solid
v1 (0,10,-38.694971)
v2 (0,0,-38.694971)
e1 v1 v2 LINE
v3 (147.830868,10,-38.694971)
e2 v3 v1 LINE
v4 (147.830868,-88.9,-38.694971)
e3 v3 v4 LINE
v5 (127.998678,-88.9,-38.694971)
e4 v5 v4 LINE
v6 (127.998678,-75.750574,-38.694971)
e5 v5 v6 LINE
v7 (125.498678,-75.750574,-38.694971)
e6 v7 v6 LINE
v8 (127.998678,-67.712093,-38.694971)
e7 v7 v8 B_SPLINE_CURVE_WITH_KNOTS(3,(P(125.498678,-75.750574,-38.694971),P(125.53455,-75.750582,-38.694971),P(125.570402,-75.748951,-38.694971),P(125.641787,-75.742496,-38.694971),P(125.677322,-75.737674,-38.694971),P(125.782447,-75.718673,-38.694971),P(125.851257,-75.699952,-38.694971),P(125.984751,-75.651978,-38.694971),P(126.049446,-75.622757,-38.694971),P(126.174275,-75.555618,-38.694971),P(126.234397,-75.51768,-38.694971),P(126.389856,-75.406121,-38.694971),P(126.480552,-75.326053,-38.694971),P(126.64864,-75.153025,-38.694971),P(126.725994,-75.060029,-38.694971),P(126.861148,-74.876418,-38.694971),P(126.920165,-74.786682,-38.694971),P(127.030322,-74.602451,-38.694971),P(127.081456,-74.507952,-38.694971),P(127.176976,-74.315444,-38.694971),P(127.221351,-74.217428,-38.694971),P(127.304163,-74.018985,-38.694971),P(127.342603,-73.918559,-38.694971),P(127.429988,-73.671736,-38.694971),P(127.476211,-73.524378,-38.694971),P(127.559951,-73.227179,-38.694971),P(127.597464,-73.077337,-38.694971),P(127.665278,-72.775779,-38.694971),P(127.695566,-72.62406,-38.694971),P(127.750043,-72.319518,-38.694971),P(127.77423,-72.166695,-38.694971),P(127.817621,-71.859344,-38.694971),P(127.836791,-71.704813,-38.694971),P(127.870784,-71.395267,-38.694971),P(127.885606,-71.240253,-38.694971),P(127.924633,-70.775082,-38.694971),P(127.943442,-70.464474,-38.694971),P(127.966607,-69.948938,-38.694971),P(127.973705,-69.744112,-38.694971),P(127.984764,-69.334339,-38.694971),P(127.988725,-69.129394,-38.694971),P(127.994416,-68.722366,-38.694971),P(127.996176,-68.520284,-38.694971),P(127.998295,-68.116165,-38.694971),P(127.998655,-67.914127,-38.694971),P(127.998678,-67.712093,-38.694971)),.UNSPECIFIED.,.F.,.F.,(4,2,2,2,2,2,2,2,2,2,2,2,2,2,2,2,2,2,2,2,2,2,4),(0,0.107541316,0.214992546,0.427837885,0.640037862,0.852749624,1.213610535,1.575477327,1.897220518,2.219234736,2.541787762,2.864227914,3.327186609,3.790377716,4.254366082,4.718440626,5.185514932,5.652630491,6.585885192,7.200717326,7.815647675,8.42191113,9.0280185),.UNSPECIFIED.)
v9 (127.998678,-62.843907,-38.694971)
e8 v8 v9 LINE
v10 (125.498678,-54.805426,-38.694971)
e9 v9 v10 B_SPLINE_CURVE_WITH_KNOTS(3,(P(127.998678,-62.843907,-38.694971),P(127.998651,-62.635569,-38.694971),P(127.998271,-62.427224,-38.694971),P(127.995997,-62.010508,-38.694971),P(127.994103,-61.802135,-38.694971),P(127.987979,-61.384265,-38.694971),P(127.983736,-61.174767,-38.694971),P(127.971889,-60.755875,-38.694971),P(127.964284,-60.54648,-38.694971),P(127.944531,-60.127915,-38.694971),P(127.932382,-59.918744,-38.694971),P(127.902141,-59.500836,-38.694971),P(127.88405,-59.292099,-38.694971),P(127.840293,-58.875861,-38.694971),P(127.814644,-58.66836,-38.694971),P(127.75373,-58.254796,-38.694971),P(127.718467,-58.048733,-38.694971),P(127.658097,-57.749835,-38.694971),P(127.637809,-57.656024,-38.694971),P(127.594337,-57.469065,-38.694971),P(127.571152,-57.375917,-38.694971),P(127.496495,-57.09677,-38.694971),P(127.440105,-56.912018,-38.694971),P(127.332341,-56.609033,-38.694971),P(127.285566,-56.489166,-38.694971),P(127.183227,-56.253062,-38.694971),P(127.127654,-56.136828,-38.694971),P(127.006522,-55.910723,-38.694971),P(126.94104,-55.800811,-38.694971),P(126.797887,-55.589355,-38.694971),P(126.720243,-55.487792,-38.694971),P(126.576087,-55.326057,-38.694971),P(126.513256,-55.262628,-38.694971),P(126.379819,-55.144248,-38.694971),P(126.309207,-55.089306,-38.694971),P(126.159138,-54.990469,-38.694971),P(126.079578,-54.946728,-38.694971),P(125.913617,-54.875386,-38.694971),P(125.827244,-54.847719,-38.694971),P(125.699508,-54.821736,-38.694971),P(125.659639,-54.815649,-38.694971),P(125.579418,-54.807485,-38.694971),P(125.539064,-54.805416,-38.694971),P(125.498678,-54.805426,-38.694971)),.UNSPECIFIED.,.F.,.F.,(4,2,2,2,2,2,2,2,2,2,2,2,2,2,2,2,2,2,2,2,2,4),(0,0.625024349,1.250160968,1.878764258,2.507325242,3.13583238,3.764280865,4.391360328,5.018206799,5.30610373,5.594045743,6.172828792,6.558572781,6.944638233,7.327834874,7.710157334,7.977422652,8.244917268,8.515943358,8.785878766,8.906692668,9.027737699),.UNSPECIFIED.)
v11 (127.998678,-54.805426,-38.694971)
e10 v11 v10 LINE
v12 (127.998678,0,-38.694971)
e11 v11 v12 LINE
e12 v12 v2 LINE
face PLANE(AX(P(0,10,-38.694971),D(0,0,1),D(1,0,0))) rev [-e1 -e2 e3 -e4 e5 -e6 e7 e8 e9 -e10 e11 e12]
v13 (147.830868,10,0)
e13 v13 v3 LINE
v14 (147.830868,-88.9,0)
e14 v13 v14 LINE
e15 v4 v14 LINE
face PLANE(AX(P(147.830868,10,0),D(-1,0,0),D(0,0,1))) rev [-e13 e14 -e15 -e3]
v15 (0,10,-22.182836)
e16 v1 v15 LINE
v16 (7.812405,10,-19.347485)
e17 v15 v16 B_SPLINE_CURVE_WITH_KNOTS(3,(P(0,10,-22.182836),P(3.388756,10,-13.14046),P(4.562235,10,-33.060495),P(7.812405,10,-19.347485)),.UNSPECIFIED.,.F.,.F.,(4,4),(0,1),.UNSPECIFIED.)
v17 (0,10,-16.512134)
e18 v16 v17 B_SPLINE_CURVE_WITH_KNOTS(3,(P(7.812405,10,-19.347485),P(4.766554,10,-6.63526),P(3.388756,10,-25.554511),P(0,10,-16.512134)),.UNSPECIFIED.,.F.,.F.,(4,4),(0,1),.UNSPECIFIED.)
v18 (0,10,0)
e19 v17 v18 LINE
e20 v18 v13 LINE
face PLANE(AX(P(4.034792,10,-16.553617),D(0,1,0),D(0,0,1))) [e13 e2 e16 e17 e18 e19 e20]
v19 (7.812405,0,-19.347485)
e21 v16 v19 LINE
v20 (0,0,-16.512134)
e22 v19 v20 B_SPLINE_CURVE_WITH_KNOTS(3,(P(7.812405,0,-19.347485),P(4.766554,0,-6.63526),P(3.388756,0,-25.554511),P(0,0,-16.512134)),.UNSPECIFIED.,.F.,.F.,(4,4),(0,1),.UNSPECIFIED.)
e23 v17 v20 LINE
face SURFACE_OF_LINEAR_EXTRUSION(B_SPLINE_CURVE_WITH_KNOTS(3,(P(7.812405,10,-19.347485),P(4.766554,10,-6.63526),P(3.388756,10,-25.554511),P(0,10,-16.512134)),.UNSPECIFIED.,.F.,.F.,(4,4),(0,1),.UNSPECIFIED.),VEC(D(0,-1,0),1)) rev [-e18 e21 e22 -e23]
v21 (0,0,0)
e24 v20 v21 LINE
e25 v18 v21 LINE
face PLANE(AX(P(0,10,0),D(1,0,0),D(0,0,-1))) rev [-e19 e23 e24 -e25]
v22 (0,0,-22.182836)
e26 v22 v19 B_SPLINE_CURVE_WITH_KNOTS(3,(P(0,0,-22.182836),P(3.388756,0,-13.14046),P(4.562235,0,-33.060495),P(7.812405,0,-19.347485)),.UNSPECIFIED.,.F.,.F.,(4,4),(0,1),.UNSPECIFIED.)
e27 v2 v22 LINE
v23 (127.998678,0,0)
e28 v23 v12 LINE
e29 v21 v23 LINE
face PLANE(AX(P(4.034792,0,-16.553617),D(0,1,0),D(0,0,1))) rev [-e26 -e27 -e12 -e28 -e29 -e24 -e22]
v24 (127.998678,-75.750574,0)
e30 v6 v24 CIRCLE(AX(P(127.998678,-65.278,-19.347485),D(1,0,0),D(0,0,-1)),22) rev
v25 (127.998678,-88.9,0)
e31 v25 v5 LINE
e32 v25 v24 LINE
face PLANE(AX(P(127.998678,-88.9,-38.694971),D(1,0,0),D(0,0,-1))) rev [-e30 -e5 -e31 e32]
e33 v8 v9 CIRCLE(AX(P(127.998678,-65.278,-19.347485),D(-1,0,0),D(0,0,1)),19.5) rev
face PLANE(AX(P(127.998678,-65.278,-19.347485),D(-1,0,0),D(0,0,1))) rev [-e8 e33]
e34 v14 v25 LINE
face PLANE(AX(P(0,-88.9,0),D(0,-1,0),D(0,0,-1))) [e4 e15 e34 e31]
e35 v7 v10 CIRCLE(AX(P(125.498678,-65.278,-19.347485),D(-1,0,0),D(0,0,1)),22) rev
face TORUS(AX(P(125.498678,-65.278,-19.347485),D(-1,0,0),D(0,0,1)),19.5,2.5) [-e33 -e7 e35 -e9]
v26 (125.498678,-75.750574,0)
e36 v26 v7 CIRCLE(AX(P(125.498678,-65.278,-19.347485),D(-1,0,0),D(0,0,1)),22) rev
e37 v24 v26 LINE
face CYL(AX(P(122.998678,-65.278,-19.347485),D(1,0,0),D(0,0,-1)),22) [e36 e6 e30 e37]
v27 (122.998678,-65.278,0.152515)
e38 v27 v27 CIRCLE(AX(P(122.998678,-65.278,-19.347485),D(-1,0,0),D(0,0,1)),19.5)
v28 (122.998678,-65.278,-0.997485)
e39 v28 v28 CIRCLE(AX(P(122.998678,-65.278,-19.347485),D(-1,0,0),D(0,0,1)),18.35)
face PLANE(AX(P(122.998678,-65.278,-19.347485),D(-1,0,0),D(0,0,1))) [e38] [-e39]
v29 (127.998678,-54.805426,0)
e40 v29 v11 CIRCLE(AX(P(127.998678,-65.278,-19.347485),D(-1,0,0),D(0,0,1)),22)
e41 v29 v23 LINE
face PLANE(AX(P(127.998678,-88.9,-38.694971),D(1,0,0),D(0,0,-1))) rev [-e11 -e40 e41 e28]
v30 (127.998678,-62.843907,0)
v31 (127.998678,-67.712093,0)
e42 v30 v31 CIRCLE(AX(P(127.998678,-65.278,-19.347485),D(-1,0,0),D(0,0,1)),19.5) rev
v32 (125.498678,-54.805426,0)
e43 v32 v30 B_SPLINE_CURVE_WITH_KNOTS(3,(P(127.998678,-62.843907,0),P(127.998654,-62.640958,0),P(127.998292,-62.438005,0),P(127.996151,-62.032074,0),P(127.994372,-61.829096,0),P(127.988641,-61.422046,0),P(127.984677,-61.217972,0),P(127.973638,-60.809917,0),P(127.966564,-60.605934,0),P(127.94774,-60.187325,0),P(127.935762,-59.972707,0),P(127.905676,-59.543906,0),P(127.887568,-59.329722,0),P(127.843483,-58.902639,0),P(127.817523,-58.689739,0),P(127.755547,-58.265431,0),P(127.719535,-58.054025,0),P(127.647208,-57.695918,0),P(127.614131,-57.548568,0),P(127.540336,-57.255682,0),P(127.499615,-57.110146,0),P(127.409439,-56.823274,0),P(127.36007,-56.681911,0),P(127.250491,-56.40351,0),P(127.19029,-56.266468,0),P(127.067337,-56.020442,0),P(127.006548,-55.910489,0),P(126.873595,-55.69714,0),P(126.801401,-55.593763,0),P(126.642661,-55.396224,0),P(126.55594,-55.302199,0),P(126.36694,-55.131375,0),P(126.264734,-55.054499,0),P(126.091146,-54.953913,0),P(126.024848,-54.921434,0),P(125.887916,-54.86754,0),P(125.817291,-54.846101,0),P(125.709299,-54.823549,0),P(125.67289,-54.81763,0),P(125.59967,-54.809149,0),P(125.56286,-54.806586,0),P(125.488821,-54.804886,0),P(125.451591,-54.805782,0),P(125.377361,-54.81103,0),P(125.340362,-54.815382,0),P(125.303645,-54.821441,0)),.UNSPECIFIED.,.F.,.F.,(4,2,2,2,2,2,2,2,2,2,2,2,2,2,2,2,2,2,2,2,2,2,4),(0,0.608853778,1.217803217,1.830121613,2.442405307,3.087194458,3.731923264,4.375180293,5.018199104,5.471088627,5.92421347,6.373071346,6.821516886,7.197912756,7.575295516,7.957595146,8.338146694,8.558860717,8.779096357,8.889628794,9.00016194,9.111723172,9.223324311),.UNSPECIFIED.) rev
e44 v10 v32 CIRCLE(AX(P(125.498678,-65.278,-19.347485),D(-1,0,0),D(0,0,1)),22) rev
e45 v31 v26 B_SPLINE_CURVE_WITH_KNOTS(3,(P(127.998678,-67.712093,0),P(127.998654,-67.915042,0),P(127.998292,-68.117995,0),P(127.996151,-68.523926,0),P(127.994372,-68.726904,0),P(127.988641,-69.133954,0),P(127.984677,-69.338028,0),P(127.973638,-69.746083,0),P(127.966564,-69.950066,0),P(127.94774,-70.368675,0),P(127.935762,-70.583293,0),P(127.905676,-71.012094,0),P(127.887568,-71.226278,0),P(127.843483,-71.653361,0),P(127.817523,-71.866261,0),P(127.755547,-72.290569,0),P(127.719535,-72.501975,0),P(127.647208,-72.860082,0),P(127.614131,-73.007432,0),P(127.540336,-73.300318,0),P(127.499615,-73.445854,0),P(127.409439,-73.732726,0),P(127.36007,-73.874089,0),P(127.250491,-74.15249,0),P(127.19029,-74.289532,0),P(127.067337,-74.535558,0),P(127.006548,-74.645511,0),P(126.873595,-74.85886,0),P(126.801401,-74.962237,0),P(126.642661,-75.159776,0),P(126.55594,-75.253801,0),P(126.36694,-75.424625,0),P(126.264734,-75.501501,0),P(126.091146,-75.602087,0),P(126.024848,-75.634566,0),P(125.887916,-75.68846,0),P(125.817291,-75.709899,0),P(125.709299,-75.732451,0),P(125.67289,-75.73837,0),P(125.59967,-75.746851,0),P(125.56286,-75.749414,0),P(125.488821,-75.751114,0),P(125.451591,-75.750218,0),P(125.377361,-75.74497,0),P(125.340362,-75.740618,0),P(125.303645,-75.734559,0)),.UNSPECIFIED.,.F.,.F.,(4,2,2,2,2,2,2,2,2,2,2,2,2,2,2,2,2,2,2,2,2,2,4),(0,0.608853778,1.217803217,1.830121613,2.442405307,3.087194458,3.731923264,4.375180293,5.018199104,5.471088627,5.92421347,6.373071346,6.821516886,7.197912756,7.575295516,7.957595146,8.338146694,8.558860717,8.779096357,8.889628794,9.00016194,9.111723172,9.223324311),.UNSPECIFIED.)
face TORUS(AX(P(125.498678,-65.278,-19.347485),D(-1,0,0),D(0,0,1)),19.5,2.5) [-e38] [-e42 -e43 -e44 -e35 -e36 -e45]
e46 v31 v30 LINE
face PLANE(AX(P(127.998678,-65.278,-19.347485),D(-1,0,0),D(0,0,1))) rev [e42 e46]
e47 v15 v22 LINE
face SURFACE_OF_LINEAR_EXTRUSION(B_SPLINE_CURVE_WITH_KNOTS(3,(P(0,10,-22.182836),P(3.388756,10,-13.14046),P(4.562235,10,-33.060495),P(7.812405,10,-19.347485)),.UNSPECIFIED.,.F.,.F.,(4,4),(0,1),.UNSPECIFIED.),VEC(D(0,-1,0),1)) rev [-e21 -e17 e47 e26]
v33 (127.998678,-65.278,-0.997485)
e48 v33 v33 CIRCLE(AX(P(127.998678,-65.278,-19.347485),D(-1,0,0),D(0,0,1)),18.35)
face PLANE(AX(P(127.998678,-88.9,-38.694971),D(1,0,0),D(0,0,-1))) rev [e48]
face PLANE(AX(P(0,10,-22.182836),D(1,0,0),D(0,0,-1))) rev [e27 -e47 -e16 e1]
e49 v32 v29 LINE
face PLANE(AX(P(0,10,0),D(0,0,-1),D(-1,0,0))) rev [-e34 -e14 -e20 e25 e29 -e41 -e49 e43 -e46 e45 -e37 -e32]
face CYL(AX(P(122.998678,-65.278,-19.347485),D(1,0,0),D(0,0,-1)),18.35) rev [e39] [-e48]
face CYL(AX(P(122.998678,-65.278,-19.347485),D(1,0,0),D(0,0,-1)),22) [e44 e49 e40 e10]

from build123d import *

# Parameters (mm, degrees)
BOSS_EXTRUDE1_DEPTH = 10
SKETCH5_W           = 19.832190572
SKETCH5_H           = 38.694970839
BOSS_EXTRUDE2_DEPTH = 88.9
SKETCH6_R           = 22
SKETCH6_R_2         = 18.35
BOSS_EXTRUDE5_DEPTH = 5
FILLET8_R           = 2.5
FILLET10_R          = 2.5


# Some blends are built 0.0001 mm under size
with BuildPart() as part:
    # Sketch1 → Boss-Extrude1 (new body)
    with BuildSketch(Plane(origin=(0, 0, 0), x_dir=(1, 0, 0), z_dir=(0, 1, 0))):
        with BuildLine():
            Line((0, 22.182836405), (0, 38.694970839))
            Line((0, 38.694970839), (147.830868253, 38.694970839))
            Line((147.830868253, 38.694970839), (147.830868253, 0))
            Line((147.830868253, 0), (0, 0))
            Line((0, 0), (0, 16.512134434))
            add(Edge.make_bspline(
                [(0, 16.512134434), (3.388756459, 25.554510726), (4.766553868, 6.635260128), (7.812405429, 19.34748542)],
                knots=[0, 0, 0, 0, 1, 1, 1, 1], degree=3))
            add(Edge.make_bspline(
                [(0, 22.182836405), (3.388756459, 13.140460113), (4.562234719, 33.060495119), (7.812405429, 19.34748542)],
                knots=[0, 0, 0, 0, 1, 1, 1, 1], degree=3))
        make_face()
    extrude(amount=BOSS_EXTRUDE1_DEPTH)

    # Sketch5 → Boss-Extrude2 (add)
    with BuildSketch(Plane.XZ):
        with Locations((137.914772967, -19.347485419)):
            Rectangle(SKETCH5_W, SKETCH5_H)
    extrude(amount=BOSS_EXTRUDE2_DEPTH)

    # Sketch6 → Boss-Extrude5 (add)
    with BuildSketch(Plane.ZY.offset(-127.998677681)):
        with Locations(Location((-19.34748542, -65.278, 0), (0, 0, 151.573820003))):
            Circle(SKETCH6_R)
        with Locations((-19.34748542, -65.278)):
            Circle(SKETCH6_R_2, mode=Mode.SUBTRACT)
    extrude(amount=BOSS_EXTRUDE5_DEPTH)

    # Fillet8
    # the kernel refuses this fillet: 2.5 mm, written as the material it takes off along each edge
    with BuildSketch(Plane(origin=(122.998677681, -65.278, -19.34748542), x_dir=(0, 0.4760260947170219, -0.8794311554342733), z_dir=(0, 0.8794311554342733, 0.4760260947170219))) as fillet8_piece_1:
        with BuildLine():
            CenterArc((22 - FILLET8_R, -FILLET8_R), FILLET8_R, 0, 90)
            Line((22 - FILLET8_R, 0), (22, 0))
            Line((22, 0), (22, -FILLET8_R))
        make_face()
    revolve(axis=Axis((122.998677681, -65.278, -19.34748542), (-1, 0, 0)), mode=Mode.SUBTRACT)
    with BuildSketch(Plane(origin=(127.998677681, -65.278, -19.34748542), x_dir=(0, -0.7034691190214044, 0.7107258251838392), z_dir=(0, -0.7107258251838392, -0.7034691190214044))) as fillet8_piece_2_section:
        with BuildLine():
            CenterArc((22 - FILLET8_R, FILLET8_R), FILLET8_R, 270, 90)
            Line((22 - FILLET8_R, 0), (22, 0))
            Line((22, 0), (22, FILLET8_R))
        make_face()
    fillet8_piece_2 = revolve(axis=Axis((127.998677681, -65.278, -19.34748542), (-1, 0, 0)), revolution_arc=89.411997633, mode=Mode.PRIVATE)
    fillet8_piece_2 = split(fillet8_piece_2, bisect_by=Plane(origin=(127.287251046, -65.278, 0), z_dir=(0, 0, 1)), keep=Keep.TOP, mode=Mode.PRIVATE)
    add(fillet8_piece_2, mode=Mode.SUBTRACT)

    # Fillet10
    fillet10_edges = [part.edges().sort_by_distance(p)[0] for p in [
        (127.998677681, -65.278, -41.34748542),
    ]]
    fillet(fillet10_edges, radius=FILLET10_R - 0.0001)  # a hair under: the kernel refuses the full size


solid = part.part
